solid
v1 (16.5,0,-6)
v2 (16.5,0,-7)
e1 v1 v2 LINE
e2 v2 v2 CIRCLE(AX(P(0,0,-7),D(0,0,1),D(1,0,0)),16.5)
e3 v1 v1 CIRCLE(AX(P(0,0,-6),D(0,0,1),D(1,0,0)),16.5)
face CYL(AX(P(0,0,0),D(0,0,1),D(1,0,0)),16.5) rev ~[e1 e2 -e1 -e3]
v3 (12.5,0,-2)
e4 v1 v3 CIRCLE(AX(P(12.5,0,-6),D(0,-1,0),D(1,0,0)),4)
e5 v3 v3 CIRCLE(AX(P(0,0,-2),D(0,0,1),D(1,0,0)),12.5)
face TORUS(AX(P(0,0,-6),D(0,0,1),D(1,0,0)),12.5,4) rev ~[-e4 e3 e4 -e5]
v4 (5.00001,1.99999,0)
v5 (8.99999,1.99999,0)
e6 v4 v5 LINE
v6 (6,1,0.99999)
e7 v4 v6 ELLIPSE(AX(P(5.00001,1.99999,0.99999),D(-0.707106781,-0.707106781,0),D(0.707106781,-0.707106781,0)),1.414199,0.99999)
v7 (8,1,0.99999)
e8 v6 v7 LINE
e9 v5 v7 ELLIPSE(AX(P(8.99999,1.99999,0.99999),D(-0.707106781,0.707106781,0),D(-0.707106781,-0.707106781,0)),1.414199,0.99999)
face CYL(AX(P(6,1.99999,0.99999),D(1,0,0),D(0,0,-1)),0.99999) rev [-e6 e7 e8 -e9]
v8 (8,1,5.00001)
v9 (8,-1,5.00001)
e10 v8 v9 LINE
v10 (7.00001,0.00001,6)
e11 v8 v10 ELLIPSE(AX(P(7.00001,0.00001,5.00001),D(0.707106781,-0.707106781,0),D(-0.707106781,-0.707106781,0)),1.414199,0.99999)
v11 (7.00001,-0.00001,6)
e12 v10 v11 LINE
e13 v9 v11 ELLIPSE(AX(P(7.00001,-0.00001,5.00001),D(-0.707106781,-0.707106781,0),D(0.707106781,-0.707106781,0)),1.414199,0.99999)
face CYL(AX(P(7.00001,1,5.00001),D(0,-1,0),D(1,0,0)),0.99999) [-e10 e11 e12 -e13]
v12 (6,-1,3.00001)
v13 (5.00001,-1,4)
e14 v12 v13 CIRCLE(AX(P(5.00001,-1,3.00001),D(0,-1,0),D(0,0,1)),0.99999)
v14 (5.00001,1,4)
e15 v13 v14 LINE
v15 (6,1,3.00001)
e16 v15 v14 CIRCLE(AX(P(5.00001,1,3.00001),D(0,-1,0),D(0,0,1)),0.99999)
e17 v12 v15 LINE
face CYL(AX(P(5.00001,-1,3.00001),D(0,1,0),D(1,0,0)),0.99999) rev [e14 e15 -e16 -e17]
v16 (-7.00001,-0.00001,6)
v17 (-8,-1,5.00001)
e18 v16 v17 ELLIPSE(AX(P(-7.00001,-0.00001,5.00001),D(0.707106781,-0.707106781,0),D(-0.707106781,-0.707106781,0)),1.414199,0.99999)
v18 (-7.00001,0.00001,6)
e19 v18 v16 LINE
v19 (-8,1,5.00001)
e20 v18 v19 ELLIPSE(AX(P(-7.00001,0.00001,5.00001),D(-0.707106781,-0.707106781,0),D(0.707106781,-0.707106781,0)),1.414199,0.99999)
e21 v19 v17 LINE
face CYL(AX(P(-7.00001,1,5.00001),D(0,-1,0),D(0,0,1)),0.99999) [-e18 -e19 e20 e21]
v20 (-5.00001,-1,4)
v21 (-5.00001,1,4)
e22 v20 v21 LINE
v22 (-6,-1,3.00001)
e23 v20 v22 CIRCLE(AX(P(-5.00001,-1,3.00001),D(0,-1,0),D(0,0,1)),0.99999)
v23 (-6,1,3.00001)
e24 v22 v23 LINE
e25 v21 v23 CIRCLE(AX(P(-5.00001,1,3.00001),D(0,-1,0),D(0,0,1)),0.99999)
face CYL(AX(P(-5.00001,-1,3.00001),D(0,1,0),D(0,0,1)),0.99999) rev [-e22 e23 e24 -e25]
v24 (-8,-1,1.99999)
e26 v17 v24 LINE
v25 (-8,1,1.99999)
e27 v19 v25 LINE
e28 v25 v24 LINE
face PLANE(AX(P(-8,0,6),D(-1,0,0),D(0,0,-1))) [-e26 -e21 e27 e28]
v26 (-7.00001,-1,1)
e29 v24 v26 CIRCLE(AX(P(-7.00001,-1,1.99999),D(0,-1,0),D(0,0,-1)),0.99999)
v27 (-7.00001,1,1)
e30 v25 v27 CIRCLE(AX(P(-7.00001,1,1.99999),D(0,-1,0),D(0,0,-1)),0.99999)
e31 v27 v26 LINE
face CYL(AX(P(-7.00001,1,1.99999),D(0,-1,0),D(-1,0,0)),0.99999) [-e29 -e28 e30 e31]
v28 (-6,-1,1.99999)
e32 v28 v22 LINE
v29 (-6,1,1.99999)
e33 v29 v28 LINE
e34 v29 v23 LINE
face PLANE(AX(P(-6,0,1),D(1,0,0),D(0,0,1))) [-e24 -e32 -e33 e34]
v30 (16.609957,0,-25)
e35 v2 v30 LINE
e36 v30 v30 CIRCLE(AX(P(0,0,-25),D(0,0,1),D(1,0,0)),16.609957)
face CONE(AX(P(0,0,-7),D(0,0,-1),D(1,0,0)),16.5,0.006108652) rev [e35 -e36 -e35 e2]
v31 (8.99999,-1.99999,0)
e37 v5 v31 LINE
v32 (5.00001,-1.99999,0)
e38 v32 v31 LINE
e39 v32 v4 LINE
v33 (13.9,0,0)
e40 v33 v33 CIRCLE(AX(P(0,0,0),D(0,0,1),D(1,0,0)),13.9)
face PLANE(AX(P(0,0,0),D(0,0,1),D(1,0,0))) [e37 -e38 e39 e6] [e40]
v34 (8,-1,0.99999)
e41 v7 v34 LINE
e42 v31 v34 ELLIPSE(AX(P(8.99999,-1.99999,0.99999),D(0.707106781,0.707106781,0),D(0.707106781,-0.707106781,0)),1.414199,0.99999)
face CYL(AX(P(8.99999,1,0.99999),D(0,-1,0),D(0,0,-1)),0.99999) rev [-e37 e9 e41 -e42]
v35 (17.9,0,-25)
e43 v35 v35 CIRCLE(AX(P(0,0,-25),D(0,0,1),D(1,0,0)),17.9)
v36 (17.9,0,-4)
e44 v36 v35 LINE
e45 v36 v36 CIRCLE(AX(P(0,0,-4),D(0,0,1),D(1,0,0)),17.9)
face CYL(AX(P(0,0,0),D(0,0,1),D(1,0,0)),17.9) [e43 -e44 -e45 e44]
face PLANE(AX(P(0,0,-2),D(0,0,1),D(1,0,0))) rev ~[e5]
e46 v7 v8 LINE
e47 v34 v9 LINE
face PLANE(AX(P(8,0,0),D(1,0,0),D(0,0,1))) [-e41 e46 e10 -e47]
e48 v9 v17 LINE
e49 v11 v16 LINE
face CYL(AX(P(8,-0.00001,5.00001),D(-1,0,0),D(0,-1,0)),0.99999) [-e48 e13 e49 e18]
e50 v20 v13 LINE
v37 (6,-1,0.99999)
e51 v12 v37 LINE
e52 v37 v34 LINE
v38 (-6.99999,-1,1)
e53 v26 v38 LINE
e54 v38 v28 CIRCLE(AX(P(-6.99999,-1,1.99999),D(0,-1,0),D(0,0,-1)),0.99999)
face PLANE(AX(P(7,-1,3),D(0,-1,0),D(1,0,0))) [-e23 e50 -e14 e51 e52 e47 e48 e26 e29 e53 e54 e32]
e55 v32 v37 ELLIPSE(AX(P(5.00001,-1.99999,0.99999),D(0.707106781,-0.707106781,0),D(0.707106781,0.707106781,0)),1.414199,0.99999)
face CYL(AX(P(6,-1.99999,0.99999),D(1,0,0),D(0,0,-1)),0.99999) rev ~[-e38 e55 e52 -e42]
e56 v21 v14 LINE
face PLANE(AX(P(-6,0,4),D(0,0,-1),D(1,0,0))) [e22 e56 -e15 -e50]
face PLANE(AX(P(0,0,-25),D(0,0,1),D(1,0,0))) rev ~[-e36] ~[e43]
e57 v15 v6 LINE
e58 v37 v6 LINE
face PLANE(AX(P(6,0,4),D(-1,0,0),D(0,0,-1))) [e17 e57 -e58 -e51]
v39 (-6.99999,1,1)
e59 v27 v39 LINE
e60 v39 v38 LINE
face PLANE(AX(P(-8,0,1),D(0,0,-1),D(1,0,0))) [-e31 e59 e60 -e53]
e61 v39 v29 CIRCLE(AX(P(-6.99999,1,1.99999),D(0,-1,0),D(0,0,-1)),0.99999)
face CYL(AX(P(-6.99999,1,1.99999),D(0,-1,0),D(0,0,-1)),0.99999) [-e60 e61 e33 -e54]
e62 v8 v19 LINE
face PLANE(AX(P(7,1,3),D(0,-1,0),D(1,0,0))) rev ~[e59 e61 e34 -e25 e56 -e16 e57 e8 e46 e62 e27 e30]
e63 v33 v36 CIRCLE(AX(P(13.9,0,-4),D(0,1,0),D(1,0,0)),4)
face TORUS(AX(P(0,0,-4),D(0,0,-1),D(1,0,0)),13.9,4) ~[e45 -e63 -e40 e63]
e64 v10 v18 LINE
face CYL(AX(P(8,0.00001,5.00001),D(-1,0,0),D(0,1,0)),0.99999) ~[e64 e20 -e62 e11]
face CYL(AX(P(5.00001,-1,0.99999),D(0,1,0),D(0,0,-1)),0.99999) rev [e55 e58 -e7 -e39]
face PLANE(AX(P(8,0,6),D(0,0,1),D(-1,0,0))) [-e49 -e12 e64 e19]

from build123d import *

# Parameters (mm, degrees)
F0_R     = 17.9
F0_R_2   = 16.5
F1_DEPTH = 25
F3_DEPTH = 2
F4_W     = 2
F4_H     = 3
F4_H_2   = 2
F5_DEPTH = 1
F6_R     = 0.99999
F7_R     = 4
F8_SIZE2 = 0.1099571106
F8_SIZE  = 18


# Not quite as in the source:
# - a fillet or chamfer is up to 0.001 mm smaller than in the source, because OpenCascade refuses the exact size


with BuildPart() as f1:
    # F0 (on Top) → F1 (new body)
    with BuildSketch(Plane.XY):
        Circle(F0_R)
        Circle(F0_R_2, mode=Mode.SUBTRACT)
    extrude(amount=-F1_DEPTH)

    # F0 (on Top) → F3 (join)
    with BuildSketch(Plane.XY):
        Circle(F0_R_2)
    extrude(amount=-F3_DEPTH)

    # F4 (on face) → F5 (join, symmetric)
    with BuildSketch(Plane.XZ):
        Polygon((6, 4), (6, 0), (8, 0), (8, 6), (6, 6), align=None)
        with Locations((-7, 2.5)):
            Rectangle(F4_W, F4_H)
        with Locations((-7, 5)):
            Rectangle(F4_W, F4_H_2)
        Polygon((-4, 4), (6, 4), (6, 6), (-6, 6), (-6, 4), align=None)
    extrude(amount=F5_DEPTH, both=True)

    # F6 (radius 1 in the source; OpenCascade refuses exactly that, so slightly less here)
    f6_edges = [f1.edges().sort_by_distance(p)[0] for p in [
        (8, 0, 0),
        (7, -1, 0),
        (7, 1, 0),
        (6, 0, 4),
        (-6, 0, 4),
        (8, 0, 6),
        (-8, 0, 6),
        (6, 0, 0),
        (-8, 0, 1),
        (-6, 0, 1),
        (0, -1, 6),
        (0, 1, 6),
    ]]
    fillet(f6_edges, radius=F6_R)

    # F7
    f7_edges = [f1.edges().sort_by_distance(p)[0] for p in [
        (-17.9, 0, 0),
        (-16.5, 0, -2),
    ]]
    fillet(f7_edges, radius=F7_R)

    # F8
    f8_edges = [f1.edges().sort_by_distance(p)[0] for p in [
        (-16.5, 0, -25),
    ]]
    f8_side = f1.faces().sort_by_distance((-16.5, 0, -15.5))[0]
    chamfer(f8_edges, length=F8_SIZE, length2=F8_SIZE2, reference=f8_side)


solid = f1.part
